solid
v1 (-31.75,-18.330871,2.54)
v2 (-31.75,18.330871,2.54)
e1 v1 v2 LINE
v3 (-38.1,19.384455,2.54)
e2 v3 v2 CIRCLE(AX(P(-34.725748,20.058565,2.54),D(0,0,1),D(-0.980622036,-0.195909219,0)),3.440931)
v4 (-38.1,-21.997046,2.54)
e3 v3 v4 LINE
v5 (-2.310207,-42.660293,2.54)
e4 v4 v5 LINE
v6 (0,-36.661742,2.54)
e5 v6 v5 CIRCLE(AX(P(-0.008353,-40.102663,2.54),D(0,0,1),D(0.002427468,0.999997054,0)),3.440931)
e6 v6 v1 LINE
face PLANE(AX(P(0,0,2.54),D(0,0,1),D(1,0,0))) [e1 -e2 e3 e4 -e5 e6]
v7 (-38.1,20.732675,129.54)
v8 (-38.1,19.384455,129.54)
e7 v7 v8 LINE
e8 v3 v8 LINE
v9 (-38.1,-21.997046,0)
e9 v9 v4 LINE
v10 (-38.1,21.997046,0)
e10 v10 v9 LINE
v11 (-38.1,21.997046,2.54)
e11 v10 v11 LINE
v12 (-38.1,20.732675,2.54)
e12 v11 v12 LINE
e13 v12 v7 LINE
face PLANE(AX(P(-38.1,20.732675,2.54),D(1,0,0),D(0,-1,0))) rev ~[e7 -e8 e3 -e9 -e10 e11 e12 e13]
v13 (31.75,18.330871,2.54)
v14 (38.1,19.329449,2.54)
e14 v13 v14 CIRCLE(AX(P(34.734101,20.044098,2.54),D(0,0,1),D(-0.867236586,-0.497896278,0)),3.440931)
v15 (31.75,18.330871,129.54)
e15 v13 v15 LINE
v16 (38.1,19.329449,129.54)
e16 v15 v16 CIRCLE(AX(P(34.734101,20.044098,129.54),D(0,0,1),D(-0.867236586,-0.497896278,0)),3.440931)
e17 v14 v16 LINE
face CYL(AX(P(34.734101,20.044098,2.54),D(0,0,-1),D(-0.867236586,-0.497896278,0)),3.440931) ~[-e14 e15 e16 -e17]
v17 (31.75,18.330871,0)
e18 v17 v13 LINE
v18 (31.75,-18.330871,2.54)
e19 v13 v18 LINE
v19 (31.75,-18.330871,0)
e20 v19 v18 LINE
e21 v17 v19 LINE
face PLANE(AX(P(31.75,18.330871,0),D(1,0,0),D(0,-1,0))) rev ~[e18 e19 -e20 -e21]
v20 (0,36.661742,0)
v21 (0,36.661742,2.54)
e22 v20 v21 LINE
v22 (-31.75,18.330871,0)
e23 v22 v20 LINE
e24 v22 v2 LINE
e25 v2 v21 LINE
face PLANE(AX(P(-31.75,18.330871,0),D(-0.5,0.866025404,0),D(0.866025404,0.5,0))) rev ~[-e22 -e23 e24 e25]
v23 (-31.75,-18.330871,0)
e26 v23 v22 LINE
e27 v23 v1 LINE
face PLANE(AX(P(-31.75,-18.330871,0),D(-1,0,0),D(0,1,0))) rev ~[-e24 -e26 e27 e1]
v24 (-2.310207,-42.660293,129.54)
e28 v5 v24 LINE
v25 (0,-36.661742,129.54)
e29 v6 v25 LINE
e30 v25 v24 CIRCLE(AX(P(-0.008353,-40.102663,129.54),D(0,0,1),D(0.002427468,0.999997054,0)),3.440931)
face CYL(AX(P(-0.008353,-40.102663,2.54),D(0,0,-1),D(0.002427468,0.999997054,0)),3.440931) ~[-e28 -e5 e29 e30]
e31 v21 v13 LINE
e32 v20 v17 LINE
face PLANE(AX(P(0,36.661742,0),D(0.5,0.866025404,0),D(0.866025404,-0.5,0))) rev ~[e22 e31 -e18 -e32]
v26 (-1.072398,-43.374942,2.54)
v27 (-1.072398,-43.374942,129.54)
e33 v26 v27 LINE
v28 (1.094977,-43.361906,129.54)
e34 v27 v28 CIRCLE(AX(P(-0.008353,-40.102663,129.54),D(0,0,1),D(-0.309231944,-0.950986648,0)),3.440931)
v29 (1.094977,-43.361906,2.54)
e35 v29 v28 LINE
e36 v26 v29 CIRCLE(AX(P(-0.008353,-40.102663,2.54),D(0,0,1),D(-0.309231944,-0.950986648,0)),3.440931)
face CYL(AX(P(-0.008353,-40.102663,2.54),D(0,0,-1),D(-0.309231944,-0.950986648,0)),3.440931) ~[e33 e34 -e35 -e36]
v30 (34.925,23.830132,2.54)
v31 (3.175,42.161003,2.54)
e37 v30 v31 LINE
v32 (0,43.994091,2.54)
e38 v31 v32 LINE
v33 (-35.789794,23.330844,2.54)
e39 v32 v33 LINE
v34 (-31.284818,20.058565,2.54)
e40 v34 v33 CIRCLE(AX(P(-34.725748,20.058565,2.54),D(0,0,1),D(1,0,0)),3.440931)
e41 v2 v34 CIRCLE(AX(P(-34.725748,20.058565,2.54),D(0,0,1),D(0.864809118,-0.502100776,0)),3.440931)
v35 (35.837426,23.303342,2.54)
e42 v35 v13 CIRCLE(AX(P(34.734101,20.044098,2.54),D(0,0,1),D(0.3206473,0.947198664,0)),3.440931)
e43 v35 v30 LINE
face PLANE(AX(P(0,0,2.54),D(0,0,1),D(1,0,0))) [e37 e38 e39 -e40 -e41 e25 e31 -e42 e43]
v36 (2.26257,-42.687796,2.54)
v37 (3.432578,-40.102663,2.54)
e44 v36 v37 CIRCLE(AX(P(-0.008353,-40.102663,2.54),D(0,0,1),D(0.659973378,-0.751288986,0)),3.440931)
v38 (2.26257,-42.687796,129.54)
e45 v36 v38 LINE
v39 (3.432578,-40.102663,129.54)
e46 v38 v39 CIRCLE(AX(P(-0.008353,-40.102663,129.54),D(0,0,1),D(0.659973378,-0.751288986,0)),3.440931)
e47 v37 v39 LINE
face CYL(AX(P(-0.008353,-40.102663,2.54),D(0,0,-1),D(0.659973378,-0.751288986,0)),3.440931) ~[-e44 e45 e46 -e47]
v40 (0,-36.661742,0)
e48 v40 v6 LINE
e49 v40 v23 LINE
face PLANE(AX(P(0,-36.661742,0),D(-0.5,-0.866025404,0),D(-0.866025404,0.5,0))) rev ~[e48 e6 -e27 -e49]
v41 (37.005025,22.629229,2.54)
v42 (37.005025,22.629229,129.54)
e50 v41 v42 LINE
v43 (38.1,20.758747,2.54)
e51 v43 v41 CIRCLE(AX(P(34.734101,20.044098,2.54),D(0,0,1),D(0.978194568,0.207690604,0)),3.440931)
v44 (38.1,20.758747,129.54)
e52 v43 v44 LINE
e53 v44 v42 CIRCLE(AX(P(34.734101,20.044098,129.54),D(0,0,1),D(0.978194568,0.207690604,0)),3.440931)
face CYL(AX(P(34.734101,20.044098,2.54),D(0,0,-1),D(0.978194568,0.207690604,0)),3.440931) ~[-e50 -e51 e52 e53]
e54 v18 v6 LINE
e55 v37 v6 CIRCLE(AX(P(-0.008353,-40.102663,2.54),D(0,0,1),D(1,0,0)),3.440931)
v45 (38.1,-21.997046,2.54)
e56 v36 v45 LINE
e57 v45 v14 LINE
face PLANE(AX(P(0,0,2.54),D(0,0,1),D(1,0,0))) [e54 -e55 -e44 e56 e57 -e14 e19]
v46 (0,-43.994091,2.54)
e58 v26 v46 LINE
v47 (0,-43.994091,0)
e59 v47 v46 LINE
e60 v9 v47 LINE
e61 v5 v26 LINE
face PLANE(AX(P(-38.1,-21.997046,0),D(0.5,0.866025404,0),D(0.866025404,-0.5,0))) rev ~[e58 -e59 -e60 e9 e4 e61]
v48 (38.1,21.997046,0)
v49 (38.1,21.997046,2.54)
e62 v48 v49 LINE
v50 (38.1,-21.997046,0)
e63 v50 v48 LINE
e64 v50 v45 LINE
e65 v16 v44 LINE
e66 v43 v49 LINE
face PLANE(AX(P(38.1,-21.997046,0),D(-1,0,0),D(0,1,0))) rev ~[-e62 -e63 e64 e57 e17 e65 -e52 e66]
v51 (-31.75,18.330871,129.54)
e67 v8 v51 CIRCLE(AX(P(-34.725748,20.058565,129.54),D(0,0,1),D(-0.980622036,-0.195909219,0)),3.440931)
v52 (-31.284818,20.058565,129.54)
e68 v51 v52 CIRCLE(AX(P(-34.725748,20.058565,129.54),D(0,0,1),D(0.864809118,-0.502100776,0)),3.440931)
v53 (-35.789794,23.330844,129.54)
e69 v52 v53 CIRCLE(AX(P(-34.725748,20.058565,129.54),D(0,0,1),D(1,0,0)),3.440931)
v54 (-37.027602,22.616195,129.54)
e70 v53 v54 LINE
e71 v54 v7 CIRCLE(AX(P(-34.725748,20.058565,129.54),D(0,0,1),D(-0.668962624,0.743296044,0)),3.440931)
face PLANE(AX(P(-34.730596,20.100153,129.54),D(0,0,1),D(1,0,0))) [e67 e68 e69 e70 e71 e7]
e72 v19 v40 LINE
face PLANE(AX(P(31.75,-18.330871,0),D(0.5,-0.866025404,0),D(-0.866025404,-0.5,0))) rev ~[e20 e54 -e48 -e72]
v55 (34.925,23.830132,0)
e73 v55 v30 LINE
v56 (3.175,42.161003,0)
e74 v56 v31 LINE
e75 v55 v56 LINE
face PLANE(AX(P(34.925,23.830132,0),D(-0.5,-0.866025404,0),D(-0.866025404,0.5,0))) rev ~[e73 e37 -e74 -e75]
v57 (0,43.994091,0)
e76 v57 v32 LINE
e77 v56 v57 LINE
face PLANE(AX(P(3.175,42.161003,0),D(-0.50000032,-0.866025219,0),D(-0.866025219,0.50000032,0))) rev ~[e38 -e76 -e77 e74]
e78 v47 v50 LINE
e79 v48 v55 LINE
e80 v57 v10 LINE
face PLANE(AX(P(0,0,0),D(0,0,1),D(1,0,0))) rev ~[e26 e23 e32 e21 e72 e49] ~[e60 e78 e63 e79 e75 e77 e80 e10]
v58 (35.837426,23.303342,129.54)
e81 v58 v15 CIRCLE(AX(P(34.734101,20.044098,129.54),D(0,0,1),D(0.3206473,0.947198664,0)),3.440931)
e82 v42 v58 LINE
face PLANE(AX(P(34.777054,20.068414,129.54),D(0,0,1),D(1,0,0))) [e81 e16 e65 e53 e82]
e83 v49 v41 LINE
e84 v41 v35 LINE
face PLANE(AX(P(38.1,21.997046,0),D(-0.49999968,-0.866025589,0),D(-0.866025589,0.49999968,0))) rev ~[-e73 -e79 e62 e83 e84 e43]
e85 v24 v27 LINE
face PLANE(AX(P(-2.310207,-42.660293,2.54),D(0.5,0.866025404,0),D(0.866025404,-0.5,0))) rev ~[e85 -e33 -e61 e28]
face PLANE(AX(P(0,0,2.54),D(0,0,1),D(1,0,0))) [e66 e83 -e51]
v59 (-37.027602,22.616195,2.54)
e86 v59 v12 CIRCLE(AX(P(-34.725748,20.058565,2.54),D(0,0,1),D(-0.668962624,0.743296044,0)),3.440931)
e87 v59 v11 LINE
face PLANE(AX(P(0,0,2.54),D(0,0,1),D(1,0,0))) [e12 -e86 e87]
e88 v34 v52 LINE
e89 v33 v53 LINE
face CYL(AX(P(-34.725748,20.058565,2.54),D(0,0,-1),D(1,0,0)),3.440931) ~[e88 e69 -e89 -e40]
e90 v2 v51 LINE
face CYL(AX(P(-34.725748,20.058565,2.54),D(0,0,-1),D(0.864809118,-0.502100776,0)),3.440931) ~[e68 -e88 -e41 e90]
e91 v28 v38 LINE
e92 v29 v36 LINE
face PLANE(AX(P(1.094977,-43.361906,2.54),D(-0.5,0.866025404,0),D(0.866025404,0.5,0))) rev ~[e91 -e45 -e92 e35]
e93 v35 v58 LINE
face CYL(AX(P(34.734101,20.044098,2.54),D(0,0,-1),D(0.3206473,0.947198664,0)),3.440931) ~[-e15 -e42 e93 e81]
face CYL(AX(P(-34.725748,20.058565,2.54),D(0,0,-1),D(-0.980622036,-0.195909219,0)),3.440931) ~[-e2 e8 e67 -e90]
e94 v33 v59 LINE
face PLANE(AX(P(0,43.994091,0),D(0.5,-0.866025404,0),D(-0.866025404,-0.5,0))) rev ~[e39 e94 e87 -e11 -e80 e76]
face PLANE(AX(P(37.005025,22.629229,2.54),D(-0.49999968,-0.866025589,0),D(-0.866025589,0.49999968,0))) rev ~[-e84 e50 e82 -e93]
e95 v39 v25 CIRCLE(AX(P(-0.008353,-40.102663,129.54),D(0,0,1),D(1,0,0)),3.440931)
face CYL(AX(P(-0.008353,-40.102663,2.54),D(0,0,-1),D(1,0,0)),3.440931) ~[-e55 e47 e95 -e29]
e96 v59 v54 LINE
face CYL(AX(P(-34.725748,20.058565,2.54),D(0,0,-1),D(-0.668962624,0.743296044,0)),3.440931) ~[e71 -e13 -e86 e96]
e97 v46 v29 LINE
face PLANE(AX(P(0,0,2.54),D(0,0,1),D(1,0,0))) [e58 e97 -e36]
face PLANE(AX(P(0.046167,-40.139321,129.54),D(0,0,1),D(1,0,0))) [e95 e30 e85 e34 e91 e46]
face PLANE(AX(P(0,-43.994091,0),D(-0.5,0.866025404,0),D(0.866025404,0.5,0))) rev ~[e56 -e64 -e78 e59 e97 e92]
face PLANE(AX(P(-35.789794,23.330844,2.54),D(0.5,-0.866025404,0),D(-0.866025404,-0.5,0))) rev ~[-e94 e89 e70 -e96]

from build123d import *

# Parameters (mm, degrees)
F1_DEPTH = 2.54
F3_DEPTH = 127


# Not quite as in the source:
# - ends of sketch curves that miss each other by under 0.0002 mm in the source are joined


with BuildPart() as f1:
    # F0 (on Top) → F1 (new body)
    with BuildSketch(Plane.XY):
        Polygon((34.9249995572, 23.8301315939), (3.1749995572, 42.1610026407), (0, 43.994091056), (-38.1000004709, 21.997045528), (-38.1000004709, -21.997045528), (0, -43.994091056), (38.1000004709, -21.997045528), (38.1000004709, 21.997045528), align=None)
        Polygon((0, 36.6617420935), (31.75, 18.3308710468), (31.75, -18.3308710468), (0, -36.6617420935), (-31.75, -18.3308710468), (-31.75, 18.3308710468), align=None, mode=Mode.SUBTRACT)
    extrude(amount=F1_DEPTH)

    # F2 (on face) → F3 (join)
    with BuildSketch(Plane.XY.offset(2.54)):
        with BuildLine():
            ThreePointArc((-38.1000004709, 19.3844549358), (-35.2889631462, 16.6640411269), (-31.75, 18.3308710468))
            ThreePointArc((-31.75, 18.3308710468), (-31.403147802, 19.1639531761), (-31.2848175618, 20.0585649554))
            ThreePointArc((-31.2848175618, 20.0585649554), (-32.7035344951, 22.8425648101), (-35.7897937807, 23.3308439825))
            Line((-35.7897937807, 23.3308439825), (-37.0276020707, 22.616195033))
            ThreePointArc((-37.0276020707, 22.616195033), (-37.7159751418, 21.7610765108), (-38.1000004709, 20.7326749751))
            Line((-38.1000004709, 20.7326749751), (-38.1000004709, 19.3844549358))
        make_face()
        with BuildLine():
            ThreePointArc((35.8374259749, 23.3033424061), (32.0759629522, 22.2291160887), (31.75, 18.3308710468))
            ThreePointArc((31.75, 18.3308710468), (35.2686397989, 16.6449401257), (38.1000004709, 19.329448619))
            Line((38.1000004709, 19.329448619), (38.1000004709, 20.758746518))
            ThreePointArc((38.1000004709, 20.758746518), (37.7036332461, 21.7824533156), (37.0050252462, 22.6292292285))
            Line((37.0050252462, 22.6292292285), (35.8374259749, 23.3033424061))
        make_face()
        with BuildLine():
            ThreePointArc((3.4325778187, -40.1026625239), (2.4277039418, -37.6725121227), (0, -36.6617420935))
            ThreePointArc((0, -36.6617420935), (-3.2193789061, -38.8660080857), (-2.3102066902, -42.6602926015))
            Line((-2.3102066902, -42.6602926015), (-1.0723984002, -43.374941551))
            ThreePointArc((-1.0723984002, -43.374941551), (0.0123424988, -43.5435308567), (1.0949770186, -43.3619057795))
            Line((1.0949770186, -43.3619057795), (2.2625698225, -42.6877957599))
            ThreePointArc((2.2625698225, -42.6877957599), (3.1264590528, -41.5214500837), (3.4325778187, -40.1026625239))
        make_face()
    extrude(amount=F3_DEPTH)


solid = f1.part
